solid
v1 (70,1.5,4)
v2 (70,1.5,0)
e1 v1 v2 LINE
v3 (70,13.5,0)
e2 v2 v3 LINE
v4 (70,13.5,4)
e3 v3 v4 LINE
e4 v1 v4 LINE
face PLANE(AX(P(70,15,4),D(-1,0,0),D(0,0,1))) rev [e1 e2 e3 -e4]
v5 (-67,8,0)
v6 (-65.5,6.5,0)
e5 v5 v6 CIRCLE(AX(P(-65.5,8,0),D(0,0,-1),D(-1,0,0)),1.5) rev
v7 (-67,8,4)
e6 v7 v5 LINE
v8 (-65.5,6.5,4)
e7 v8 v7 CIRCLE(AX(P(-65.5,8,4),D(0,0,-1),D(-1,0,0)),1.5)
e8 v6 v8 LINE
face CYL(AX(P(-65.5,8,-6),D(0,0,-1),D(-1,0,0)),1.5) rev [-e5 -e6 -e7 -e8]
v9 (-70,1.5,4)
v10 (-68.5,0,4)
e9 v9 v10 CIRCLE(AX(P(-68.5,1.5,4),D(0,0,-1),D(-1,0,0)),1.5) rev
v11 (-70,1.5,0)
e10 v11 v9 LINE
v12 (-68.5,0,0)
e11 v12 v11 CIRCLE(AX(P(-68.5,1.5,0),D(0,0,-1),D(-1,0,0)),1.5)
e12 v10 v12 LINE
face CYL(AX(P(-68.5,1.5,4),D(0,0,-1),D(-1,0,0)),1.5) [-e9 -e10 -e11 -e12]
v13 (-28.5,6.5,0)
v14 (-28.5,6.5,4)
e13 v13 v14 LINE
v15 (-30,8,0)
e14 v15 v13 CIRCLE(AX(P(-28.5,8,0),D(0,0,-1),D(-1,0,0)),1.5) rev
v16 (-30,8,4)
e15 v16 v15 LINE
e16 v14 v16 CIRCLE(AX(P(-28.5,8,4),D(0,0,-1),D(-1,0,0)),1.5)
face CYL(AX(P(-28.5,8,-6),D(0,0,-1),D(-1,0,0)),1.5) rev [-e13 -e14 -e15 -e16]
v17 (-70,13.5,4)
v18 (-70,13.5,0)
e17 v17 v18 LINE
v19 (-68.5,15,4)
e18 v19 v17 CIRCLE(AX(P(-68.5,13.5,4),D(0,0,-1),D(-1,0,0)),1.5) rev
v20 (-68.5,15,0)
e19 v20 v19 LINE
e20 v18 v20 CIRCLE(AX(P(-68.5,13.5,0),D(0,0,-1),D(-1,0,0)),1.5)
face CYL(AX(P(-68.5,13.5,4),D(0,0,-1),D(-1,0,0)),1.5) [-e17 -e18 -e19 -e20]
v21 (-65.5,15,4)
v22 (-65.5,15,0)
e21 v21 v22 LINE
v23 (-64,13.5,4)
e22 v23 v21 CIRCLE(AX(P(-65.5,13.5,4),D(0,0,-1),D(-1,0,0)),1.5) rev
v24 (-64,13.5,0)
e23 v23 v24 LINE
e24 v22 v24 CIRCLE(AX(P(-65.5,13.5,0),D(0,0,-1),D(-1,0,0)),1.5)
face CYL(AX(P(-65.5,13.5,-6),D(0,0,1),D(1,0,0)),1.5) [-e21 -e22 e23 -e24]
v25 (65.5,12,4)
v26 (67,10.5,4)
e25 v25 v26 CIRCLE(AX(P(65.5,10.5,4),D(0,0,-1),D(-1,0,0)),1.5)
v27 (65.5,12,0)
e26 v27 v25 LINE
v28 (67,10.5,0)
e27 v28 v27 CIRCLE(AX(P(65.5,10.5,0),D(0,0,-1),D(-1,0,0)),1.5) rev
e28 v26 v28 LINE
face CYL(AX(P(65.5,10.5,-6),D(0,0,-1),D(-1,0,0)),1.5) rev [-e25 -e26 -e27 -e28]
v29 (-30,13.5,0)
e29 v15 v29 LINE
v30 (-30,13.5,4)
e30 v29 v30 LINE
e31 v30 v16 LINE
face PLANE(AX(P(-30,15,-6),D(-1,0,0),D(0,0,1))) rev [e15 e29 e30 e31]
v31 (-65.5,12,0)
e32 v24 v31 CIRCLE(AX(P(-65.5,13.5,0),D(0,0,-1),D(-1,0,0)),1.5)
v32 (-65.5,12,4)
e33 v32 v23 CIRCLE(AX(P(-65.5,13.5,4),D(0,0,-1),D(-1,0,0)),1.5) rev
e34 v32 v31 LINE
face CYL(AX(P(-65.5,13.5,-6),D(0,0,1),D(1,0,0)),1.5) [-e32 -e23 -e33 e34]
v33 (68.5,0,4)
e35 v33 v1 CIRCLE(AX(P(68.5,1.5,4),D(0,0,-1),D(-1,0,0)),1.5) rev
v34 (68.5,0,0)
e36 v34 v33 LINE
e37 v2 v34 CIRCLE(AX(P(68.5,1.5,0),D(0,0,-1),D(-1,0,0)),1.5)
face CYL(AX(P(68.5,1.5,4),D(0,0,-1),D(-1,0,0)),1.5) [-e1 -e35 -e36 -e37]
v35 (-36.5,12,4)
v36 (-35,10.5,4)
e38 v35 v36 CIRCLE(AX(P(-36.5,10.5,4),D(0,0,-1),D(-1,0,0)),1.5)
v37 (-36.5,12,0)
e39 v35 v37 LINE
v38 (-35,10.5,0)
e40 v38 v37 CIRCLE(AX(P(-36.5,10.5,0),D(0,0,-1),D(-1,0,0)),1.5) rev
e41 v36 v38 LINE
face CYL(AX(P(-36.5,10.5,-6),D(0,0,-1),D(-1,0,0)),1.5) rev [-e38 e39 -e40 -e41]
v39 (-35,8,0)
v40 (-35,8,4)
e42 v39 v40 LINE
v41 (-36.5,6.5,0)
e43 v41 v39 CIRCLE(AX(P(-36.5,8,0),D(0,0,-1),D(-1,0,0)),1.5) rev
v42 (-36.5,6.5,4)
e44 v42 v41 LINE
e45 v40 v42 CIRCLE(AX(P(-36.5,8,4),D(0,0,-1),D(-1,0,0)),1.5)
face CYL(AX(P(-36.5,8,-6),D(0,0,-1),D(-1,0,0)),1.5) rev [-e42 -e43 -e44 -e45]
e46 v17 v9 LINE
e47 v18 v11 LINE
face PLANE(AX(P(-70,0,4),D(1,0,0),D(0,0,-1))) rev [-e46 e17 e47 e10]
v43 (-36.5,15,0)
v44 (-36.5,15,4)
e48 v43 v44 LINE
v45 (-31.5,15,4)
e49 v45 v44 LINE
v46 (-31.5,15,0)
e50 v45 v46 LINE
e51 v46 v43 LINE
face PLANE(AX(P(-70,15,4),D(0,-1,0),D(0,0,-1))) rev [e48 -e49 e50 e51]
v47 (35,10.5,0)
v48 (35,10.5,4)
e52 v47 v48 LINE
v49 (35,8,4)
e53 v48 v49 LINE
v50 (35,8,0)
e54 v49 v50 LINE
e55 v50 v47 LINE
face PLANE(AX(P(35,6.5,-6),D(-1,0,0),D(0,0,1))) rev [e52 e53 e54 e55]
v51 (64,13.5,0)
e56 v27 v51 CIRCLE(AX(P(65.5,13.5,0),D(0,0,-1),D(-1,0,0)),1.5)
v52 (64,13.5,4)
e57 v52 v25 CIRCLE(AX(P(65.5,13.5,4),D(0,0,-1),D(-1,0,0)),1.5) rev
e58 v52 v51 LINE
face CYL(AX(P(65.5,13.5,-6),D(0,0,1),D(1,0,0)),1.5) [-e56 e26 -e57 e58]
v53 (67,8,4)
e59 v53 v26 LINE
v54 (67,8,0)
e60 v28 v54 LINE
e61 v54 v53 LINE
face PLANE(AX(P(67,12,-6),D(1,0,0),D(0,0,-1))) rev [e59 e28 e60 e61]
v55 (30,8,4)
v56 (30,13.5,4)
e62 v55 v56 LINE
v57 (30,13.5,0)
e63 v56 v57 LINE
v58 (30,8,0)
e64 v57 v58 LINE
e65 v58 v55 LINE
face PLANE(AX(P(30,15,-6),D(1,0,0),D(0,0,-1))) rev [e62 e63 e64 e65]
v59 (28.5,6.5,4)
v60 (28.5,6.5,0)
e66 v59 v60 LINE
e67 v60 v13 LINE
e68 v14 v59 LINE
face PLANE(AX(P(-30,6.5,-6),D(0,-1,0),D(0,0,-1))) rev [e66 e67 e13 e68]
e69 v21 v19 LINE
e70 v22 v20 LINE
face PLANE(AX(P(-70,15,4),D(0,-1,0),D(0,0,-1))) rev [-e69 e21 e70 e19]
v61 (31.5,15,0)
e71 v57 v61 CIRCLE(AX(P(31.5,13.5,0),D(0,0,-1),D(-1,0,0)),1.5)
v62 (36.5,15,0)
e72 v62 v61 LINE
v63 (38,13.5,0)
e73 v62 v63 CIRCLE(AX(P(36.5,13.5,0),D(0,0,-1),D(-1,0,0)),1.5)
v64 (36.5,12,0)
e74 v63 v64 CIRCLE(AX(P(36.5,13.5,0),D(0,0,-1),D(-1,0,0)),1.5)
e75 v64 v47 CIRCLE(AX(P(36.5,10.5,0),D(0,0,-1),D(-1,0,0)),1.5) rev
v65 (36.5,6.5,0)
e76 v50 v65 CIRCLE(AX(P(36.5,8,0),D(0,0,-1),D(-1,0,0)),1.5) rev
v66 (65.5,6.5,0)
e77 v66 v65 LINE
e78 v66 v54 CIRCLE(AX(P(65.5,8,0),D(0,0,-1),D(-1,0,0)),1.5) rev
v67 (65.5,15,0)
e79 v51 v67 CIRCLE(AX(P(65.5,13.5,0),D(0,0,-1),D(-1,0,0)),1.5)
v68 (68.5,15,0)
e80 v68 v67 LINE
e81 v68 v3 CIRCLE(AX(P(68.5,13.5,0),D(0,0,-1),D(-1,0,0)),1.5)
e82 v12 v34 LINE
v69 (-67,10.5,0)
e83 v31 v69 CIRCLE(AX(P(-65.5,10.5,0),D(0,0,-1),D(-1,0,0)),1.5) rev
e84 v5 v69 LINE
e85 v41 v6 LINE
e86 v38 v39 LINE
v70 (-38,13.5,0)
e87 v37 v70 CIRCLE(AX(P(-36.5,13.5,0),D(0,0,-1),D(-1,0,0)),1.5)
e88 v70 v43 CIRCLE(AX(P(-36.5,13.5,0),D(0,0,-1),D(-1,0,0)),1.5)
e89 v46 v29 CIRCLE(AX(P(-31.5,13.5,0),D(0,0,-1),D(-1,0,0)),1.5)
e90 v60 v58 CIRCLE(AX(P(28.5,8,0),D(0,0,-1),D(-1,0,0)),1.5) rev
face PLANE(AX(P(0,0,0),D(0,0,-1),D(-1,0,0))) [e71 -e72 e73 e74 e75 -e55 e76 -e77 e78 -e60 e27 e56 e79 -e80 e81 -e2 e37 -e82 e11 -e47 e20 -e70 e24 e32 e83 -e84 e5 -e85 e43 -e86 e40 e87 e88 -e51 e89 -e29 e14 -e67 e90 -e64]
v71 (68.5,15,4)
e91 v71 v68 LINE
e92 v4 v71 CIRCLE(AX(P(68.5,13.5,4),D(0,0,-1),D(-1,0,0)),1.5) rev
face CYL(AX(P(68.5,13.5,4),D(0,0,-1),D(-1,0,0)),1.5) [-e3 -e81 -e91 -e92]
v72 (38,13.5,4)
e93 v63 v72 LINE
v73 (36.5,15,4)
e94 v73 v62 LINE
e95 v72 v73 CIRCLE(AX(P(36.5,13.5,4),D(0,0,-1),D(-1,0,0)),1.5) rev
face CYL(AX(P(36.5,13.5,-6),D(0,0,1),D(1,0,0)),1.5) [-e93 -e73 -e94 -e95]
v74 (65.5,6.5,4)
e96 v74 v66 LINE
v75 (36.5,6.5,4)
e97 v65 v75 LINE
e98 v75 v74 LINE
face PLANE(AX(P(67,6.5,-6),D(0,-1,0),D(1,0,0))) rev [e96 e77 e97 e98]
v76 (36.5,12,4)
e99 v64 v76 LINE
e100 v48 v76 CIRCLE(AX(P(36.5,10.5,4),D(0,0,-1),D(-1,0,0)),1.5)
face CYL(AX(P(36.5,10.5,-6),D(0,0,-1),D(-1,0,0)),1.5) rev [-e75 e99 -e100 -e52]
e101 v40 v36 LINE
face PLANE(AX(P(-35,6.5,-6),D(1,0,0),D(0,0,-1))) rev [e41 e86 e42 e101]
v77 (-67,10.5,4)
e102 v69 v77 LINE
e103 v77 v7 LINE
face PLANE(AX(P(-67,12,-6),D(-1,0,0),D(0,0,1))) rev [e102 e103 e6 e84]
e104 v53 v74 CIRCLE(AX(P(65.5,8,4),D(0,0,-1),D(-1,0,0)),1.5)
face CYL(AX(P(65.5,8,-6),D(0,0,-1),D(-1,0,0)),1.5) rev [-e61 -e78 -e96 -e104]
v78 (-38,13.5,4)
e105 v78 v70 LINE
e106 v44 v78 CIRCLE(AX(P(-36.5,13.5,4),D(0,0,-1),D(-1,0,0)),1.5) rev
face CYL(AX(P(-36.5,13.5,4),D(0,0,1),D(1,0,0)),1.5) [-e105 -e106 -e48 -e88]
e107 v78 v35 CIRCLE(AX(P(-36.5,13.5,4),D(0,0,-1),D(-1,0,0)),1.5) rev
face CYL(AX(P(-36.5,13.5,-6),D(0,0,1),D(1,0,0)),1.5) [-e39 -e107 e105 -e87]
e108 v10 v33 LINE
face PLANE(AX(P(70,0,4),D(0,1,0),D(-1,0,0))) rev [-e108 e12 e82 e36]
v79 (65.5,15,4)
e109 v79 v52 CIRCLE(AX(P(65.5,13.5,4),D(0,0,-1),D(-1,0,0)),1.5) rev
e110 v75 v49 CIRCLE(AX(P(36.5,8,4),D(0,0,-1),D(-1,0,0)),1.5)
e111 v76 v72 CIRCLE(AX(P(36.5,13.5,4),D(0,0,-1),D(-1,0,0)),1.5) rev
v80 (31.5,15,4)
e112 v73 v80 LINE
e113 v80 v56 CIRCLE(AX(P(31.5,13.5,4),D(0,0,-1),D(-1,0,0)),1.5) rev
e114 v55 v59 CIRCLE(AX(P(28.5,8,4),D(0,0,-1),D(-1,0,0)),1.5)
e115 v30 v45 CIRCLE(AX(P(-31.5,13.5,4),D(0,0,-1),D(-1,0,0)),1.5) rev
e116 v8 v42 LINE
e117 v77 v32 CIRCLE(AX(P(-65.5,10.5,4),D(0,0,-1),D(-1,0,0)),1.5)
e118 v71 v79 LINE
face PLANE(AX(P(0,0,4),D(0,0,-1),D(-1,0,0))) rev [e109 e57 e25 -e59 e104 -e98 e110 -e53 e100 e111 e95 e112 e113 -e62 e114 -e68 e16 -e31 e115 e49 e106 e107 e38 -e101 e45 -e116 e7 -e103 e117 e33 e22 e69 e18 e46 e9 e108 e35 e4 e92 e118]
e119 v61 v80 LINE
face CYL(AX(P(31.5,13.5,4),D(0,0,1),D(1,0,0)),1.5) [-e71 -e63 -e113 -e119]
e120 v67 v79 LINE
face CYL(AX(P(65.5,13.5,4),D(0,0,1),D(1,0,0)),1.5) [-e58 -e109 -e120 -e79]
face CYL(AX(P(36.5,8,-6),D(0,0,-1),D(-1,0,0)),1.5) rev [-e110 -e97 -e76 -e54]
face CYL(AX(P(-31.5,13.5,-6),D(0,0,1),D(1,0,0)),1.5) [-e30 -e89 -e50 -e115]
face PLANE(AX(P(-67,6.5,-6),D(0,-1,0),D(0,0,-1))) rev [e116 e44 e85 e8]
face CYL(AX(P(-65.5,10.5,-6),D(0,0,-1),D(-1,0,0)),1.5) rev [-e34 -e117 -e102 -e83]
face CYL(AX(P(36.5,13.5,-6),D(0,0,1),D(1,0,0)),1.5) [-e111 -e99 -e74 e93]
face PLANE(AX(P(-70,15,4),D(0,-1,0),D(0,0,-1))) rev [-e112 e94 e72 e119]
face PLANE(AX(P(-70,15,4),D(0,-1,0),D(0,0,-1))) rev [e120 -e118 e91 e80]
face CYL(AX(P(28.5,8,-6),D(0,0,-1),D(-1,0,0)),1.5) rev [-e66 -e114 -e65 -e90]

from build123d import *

# Parameters (mm, degrees)
ESQUISSE1_W             = 140
ESQUISSE1_H             = 15
BOSS_EXTRU_1_DEPTH      = 4
ENL_V_MAT_EXTRU_1_DEPTH = 10
ESQUISSE3_W             = 60
ESQUISSE3_H             = 8.5
ENL_V_MAT_EXTRU_2_DEPTH = 10
CONG_1_R                = 1.5


with BuildPart() as part:
    # Esquisse1 → Boss.-Extru.1 (new body)
    with BuildSketch(Plane.XY):
        with Locations((0, 7.5)):
            Rectangle(ESQUISSE1_W, ESQUISSE1_H)
    extrude(amount=BOSS_EXTRU_1_DEPTH)

    # Esquisse2 → Enlèv. mat.-Extru.1 (cut)
    with BuildSketch(Plane.XY.offset(4)):
        Polygon((-64, 15), (-64, 12), (-67, 12), (-67, 6.5), (-35, 6.5), (-35, 12), (-38, 12), (-38, 15), align=None)
        Polygon((38, 12), (38, 15), (64, 15), (64, 12), (67, 12), (67, 6.5), (35, 6.5), (35, 12), align=None)
    extrude(amount=-ENL_V_MAT_EXTRU_1_DEPTH, mode=Mode.SUBTRACT)

    # Esquisse3 → Enlèv. mat.-Extru.2 (cut)
    with BuildSketch(Plane.XY.offset(4)):
        with Locations((0, 10.75)):
            Rectangle(ESQUISSE3_W, ESQUISSE3_H)
    extrude(amount=-ENL_V_MAT_EXTRU_2_DEPTH, mode=Mode.SUBTRACT)

    # Congé1
    cong_1_edges = [part.edges().sort_by_distance(p)[0] for p in [
        (30, 15, 2),
        (38, 15, 2),
        (64, 15, 2),
        (70, 15, 2),
        (-70, 0, 2),
        (-70, 15, 2),
        (-64, 15, 2),
        (-64, 12, 2),
        (-67, 12, 2),
        (-67, 6.5, 2),
        (-35, 6.5, 2),
        (-35, 12, 2),
        (-38, 12, 2),
        (-38, 15, 2),
        (-30, 15, 2),
        (-30, 6.5, 2),
        (30, 6.5, 2),
        (35, 6.5, 2),
        (67, 6.5, 2),
        (70, 0, 2),
        (64, 12, 2),
        (67, 12, 2),
        (35, 12, 2),
        (38, 12, 2),
    ]]
    fillet(cong_1_edges, radius=CONG_1_R - 0.0001)  # a hair under: the kernel refuses the full size


solid = part.part
